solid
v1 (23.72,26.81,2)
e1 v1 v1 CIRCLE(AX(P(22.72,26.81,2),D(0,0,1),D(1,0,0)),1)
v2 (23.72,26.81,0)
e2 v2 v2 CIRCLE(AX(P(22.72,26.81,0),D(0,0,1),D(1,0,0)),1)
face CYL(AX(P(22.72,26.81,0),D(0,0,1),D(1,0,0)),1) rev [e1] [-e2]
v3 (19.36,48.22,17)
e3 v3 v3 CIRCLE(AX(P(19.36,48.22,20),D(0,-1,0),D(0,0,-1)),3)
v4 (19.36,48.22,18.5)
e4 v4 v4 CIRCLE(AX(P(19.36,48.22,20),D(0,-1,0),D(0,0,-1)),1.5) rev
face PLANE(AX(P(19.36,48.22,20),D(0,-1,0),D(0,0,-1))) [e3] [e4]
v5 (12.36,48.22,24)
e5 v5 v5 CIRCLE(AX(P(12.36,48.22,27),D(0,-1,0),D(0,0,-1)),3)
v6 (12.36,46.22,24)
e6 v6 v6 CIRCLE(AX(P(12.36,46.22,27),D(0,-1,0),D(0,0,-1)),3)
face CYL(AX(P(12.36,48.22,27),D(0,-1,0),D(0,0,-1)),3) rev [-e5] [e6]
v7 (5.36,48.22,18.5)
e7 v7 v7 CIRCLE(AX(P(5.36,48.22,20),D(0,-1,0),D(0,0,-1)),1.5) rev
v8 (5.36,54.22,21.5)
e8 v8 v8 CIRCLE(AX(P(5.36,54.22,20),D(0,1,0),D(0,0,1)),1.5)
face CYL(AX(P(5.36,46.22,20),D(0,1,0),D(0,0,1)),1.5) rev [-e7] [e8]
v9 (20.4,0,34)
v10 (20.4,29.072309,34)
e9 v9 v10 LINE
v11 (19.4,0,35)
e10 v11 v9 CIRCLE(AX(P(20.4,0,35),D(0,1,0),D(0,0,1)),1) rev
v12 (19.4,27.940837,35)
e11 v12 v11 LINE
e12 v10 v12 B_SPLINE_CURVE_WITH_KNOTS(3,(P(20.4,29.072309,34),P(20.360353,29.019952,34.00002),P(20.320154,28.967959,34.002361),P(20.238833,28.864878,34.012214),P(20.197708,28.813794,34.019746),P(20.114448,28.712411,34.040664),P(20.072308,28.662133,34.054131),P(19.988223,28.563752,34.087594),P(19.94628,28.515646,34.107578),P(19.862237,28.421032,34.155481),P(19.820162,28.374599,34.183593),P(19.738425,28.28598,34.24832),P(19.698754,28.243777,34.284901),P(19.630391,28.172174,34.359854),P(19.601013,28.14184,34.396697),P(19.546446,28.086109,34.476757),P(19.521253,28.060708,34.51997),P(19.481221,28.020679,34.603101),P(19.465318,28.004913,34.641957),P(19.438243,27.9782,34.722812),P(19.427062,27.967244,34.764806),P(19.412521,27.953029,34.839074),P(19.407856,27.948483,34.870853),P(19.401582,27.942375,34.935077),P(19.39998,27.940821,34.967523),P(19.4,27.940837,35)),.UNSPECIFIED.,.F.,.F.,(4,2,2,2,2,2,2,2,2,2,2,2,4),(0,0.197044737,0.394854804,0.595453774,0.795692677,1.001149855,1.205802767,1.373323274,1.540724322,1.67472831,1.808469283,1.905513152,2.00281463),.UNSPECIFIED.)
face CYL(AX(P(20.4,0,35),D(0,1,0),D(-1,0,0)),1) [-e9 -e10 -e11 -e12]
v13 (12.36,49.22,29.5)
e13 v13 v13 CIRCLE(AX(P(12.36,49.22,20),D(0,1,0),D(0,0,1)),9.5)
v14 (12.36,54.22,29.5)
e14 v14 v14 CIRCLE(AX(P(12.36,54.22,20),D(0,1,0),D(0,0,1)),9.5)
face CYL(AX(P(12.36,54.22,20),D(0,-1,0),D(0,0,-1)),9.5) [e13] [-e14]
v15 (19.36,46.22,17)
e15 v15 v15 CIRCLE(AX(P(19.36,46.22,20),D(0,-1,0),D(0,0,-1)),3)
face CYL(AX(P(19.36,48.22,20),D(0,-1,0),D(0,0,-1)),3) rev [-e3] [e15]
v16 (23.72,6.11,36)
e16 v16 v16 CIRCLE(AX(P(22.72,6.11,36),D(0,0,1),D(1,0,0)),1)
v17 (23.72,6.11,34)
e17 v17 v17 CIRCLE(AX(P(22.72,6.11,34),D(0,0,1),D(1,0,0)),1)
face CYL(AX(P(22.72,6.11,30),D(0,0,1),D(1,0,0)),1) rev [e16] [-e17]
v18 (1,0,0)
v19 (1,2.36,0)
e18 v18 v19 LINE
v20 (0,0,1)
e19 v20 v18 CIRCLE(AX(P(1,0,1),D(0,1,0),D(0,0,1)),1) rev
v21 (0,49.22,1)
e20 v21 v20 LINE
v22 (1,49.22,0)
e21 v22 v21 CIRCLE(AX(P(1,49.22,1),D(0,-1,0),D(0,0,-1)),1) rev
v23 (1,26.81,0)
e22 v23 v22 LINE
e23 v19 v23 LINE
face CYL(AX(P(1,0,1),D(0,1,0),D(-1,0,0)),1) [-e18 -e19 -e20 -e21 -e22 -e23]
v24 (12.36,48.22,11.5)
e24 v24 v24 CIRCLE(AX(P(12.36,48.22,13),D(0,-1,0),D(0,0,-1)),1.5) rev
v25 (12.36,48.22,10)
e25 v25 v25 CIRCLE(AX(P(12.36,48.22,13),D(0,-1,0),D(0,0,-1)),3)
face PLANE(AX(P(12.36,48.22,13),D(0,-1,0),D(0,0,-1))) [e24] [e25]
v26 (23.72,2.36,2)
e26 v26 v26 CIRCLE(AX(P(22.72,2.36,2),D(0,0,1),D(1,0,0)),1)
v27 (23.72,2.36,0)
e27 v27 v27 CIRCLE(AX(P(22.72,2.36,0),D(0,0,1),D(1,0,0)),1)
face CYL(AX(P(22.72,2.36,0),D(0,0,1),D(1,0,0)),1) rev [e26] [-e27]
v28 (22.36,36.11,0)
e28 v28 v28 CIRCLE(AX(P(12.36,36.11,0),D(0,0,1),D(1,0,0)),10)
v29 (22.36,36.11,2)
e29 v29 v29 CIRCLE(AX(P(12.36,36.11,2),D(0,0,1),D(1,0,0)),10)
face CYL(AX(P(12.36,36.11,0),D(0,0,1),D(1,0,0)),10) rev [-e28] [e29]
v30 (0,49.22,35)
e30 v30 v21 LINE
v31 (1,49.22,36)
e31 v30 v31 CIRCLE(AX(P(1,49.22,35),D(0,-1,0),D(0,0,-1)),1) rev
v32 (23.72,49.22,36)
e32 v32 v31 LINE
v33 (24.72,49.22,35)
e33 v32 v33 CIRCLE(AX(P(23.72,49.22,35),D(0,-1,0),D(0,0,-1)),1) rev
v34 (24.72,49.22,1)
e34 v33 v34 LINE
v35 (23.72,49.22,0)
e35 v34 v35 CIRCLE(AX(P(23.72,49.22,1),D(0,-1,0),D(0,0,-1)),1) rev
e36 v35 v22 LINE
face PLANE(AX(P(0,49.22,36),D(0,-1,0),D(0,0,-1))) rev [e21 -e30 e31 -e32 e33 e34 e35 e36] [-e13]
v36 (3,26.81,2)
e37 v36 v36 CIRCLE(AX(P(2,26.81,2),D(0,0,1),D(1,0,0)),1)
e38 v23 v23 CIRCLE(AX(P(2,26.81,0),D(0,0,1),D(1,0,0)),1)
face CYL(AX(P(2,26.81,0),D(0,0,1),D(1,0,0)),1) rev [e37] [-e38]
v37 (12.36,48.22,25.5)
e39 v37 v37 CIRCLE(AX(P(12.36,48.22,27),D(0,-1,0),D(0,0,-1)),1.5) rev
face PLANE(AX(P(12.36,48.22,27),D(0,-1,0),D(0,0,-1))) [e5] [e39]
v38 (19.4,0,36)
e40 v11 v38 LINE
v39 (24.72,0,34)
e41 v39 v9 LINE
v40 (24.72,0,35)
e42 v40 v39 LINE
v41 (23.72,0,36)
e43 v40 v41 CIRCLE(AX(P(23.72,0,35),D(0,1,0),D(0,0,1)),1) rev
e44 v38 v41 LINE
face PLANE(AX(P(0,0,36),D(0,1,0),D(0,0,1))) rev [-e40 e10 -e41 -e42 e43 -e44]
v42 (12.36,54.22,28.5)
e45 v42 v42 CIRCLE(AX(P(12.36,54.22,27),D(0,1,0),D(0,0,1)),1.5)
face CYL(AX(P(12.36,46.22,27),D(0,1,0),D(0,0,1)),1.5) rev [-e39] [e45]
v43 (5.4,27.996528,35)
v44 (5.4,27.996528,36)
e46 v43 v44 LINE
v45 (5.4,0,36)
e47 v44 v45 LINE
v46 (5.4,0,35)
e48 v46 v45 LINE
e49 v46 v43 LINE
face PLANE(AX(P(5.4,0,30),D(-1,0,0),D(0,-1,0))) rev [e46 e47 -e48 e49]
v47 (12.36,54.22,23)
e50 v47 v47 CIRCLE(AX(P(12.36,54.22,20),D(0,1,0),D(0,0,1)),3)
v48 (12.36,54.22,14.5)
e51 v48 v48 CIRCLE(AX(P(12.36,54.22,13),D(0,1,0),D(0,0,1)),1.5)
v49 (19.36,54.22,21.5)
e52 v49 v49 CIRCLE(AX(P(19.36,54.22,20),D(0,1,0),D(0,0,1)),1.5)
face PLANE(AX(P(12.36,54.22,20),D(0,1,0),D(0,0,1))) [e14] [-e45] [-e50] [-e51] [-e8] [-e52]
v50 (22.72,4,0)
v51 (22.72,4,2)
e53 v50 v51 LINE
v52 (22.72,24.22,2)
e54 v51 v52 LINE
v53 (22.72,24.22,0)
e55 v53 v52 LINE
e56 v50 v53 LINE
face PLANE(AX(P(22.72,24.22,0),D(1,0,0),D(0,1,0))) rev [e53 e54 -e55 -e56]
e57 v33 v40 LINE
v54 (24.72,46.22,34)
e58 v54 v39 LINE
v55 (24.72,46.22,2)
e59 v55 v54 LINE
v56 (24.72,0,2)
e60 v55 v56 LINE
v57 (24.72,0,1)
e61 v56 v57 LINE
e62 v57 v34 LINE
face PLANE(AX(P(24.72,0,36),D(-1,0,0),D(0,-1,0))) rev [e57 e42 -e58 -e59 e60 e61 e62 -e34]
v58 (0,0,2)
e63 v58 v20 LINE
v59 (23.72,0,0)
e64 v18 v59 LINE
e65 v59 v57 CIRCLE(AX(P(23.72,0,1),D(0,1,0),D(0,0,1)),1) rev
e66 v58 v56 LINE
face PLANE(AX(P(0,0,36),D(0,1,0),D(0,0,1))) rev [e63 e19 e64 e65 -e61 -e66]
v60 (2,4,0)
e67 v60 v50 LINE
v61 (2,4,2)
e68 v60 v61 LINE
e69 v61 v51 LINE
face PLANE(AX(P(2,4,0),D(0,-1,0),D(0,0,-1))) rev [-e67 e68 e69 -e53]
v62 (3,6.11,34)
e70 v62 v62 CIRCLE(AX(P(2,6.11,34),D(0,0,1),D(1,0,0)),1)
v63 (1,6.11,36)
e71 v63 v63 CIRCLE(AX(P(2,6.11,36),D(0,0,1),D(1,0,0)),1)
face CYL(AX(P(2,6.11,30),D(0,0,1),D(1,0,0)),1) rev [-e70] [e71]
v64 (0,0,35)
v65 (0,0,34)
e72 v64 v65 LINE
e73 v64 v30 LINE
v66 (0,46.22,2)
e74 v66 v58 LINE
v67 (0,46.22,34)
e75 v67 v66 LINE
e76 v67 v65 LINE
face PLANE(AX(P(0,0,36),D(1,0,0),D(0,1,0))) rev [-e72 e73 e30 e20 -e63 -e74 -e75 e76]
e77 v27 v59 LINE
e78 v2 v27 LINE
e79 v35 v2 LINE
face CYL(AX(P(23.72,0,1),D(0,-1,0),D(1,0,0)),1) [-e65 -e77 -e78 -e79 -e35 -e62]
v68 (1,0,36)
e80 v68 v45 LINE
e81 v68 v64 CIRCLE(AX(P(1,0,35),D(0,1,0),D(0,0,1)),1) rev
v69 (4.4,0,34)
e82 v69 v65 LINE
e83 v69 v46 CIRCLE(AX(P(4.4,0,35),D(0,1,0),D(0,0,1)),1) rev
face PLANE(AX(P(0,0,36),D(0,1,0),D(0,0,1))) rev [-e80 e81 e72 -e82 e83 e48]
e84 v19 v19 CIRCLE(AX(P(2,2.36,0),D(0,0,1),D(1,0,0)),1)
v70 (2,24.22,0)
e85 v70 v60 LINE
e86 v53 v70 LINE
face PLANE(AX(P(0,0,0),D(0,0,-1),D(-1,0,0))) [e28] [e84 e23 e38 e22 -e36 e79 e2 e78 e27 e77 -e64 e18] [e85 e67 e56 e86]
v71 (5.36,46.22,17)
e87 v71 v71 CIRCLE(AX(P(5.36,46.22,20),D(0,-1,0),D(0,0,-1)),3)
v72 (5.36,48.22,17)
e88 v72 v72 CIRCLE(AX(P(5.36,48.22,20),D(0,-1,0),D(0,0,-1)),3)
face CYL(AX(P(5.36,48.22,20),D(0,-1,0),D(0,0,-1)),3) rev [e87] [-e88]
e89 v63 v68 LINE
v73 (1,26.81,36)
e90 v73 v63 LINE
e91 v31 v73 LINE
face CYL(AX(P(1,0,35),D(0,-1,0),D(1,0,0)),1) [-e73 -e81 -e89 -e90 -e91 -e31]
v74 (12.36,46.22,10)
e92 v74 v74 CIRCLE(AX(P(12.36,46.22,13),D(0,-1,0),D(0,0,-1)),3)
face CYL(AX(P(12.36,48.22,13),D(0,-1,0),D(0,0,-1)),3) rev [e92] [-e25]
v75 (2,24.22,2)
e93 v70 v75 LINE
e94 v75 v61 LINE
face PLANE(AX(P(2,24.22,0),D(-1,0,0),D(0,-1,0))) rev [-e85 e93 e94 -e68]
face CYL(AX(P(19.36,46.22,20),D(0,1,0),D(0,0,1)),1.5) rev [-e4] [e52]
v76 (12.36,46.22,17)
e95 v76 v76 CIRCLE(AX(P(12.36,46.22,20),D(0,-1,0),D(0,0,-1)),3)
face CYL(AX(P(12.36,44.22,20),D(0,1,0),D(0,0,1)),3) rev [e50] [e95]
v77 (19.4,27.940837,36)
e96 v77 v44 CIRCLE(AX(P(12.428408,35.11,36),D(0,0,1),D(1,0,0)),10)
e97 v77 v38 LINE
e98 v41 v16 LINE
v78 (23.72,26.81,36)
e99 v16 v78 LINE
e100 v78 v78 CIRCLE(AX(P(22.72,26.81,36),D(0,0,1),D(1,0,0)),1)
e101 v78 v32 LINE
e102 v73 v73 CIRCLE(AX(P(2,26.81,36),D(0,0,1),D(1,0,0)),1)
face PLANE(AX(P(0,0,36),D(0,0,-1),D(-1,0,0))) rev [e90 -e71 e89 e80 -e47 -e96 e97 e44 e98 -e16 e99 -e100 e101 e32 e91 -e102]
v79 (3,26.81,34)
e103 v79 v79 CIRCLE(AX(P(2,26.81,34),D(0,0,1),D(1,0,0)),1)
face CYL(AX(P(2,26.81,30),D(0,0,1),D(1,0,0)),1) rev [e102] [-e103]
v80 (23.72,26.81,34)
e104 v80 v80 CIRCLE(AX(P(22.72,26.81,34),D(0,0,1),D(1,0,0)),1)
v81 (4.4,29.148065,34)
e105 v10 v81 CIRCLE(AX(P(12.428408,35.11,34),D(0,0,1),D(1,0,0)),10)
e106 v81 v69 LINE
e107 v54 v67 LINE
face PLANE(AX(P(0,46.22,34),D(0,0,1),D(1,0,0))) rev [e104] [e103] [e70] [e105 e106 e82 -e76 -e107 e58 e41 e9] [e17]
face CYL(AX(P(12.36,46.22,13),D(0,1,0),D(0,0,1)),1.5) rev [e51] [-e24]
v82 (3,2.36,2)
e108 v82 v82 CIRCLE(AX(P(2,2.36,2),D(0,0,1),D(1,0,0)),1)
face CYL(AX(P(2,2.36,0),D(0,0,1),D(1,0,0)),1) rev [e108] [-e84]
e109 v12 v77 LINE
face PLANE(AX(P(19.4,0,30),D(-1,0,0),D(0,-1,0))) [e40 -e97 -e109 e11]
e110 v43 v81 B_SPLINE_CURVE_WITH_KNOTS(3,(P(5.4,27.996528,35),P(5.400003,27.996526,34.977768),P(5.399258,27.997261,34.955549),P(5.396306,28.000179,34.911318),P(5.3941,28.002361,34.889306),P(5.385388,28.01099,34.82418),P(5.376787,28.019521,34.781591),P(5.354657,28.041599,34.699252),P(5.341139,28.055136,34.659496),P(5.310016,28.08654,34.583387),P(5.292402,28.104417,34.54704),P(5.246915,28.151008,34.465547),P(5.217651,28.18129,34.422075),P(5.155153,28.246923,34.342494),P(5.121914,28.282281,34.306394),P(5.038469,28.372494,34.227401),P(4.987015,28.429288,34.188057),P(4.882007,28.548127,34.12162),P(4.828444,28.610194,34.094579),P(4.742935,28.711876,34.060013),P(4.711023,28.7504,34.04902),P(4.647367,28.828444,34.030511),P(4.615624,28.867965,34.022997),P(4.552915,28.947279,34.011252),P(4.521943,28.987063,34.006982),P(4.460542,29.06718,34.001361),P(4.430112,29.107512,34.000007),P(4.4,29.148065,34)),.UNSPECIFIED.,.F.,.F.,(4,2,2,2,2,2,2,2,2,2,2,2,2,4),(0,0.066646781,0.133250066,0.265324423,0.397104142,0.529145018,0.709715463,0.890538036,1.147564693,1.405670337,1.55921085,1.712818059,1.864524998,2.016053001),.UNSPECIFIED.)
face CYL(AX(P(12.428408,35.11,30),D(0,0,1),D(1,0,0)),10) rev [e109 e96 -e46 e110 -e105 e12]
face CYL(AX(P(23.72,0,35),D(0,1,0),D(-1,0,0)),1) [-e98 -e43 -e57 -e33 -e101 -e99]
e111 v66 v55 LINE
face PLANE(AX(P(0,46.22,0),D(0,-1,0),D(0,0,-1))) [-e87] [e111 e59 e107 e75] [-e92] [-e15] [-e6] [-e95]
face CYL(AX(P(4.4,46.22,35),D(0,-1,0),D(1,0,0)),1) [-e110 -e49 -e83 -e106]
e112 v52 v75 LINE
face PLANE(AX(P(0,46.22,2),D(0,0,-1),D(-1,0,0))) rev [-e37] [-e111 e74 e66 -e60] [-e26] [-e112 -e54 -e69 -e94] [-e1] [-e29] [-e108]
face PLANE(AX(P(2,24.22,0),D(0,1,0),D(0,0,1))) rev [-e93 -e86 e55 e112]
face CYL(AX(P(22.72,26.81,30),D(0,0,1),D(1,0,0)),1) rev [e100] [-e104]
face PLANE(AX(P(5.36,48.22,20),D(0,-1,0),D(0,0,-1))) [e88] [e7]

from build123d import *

# Parameters (mm, degrees)
SKETCH_1_W          = 24.72
SKETCH_1_H          = 49.22
EXTRUDE_1_DEPTH     = 36
SKETCH_3_W          = 24.72
SKETCH_3_H          = 32
CUT_EXTRUDE_1_DEPTH = 46.22
SKETCH_4_R          = 1
SKETCH_4_R_2        = 10
SKETCH_4_W          = 20.72
SKETCH_4_H          = 20.22
CUT_EXTRUDE_2_DEPTH = 2
SKETCH_6_R          = 1
CUT_EXTRUDE_3_DEPTH = 6
SKETCH_7_R          = 9.5
EXTRUDE_2_DEPTH     = 5
SKETCH_8_R          = 1.5
CUT_EXTRUDE_4_DEPTH = 8
FILLET_5_R          = 1
FILLET_6_R          = 1
FILLET_7_R          = 1
FILLET_8_R          = 1
FILLET_9_R          = 1
FILLET_10_R         = 1
SKETCH_9_R          = 3
CUT_EXTRUDE_5_DEPTH = 10
SKETCH_10_R         = 3
CUT_EXTRUDE_6_DEPTH = 2


with BuildPart() as part:
    # 草图1 → 凸台-拉伸1 (new body)
    with BuildSketch(Plane.XY):
        with Locations((12.36, 24.61)):
            Rectangle(SKETCH_1_W, SKETCH_1_H)
    extrude(amount=EXTRUDE_1_DEPTH)

    # 草图3 → 切除-拉伸1 (cut)
    with BuildSketch(Plane.XZ):
        with Locations((12.36, 18)):
            Rectangle(SKETCH_3_W, SKETCH_3_H)
    extrude(amount=-CUT_EXTRUDE_1_DEPTH, mode=Mode.SUBTRACT)

    # 草图4 → 切除-拉伸2 (cut)
    with BuildSketch(Plane.XY.offset(2)):
        with Locations((2, 2.36)):
            Circle(SKETCH_4_R)
        with Locations((22.72, 2.36)):
            Circle(SKETCH_4_R)
        with Locations((22.72, 26.81)):
            Circle(SKETCH_4_R)
        with Locations((2, 26.81)):
            Circle(SKETCH_4_R)
        with Locations((12.36, 36.11)):
            Circle(SKETCH_4_R_2)
        with Locations((12.36, 14.11)):
            Rectangle(SKETCH_4_W, SKETCH_4_H)
    extrude(amount=-CUT_EXTRUDE_2_DEPTH, mode=Mode.SUBTRACT)

    # 草图6 → 切除-拉伸3 (cut)
    with BuildSketch(Plane.XY.offset(36)):
        with BuildLine():
            Line((5.4, 27.996527822), (5.4, 28))
            Line((5.4, 28), (19.4, 28))
            Line((19.4, 28), (19.4, 27.940836898))
            ThreePointArc((19.4, 27.940836898), (21.640245754, 31.218722824), (22.428407613, 35.11))
            ThreePointArc((22.428407613, 35.11), (8.573804918, 44.337244337), (5.4, 27.996527822))
        make_face()
        with BuildLine():
            Line((19.4, 28), (5.4, 28))
            Line((5.4, 28), (5.4, 27.996527822))
            ThreePointArc((5.4, 27.996527822), (12.388628696, 25.110079118), (19.4, 27.940836898))
            Line((19.4, 27.940836898), (19.4, 28))
        make_face()
        with BuildLine():
            ThreePointArc((19.4, 27.940836898), (12.388628696, 25.110079118), (5.4, 27.996527822))
            Line((5.4, 27.996527822), (5.4, 0))
            Line((5.4, 0), (19.4, 0))
            Line((19.4, 0), (19.4, 27.940836898))
        make_face()
        with Locations((2, 26.81)):
            Circle(SKETCH_6_R)
        with Locations((22.72, 6.11)):
            Circle(SKETCH_6_R)
        with Locations((2, 6.11)):
            Circle(SKETCH_6_R)
        with Locations((22.72, 26.81)):
            Circle(SKETCH_6_R)
    extrude(amount=-CUT_EXTRUDE_3_DEPTH, mode=Mode.SUBTRACT)

    # 草图7 → 凸台-拉伸2 (add)
    with BuildSketch(Plane(origin=(0, 49.22, 0), x_dir=(1, 0, 0), z_dir=(0, 1, 0))):
        with Locations(Location((12.36, -20, 0), (0, 0, 270))):
            Circle(SKETCH_7_R)
    extrude(amount=EXTRUDE_2_DEPTH)

    # 草图8 → 切除-拉伸4 (cut)
    with BuildSketch(Plane(origin=(0, 54.22, 0), x_dir=(1, 0, 0), z_dir=(0, 1, 0))):
        with Locations(Location((12.36, -13, 0), (0, 0, 270))):
            Circle(SKETCH_8_R)
        with Locations(Location((12.36, -27, 0), (0, 0, 270))):
            Circle(SKETCH_8_R)
        with Locations(Location((19.36, -20, 0), (0, 0, 270))):
            Circle(SKETCH_8_R)
        with Locations(Location((5.36, -20, 0), (0, 0, 270))):
            Circle(SKETCH_8_R)
    extrude(amount=-CUT_EXTRUDE_4_DEPTH, mode=Mode.SUBTRACT)

    # 圆角5
    fillet_5_edges = [part.edges().sort_by_distance(p)[0] for p in [
        (0, 24.61, 36),
    ]]
    fillet(fillet_5_edges, radius=FILLET_5_R - 0.0001)  # a hair under: the kernel refuses the full size

    # 圆角6
    fillet_6_edges = [part.edges().sort_by_distance(p)[0] for p in [
        (24.72, 24.61, 36),
    ]]
    fillet(fillet_6_edges, radius=FILLET_6_R - 0.0001)  # a hair under: the kernel refuses the full size

    # 圆角7
    fillet_7_edges = [part.edges().sort_by_distance(p)[0] for p in [
        (0, 24.61, 0),
    ]]
    fillet(fillet_7_edges, radius=FILLET_7_R - 0.0001)  # a hair under: the kernel refuses the full size

    # 圆角8
    fillet_8_edges = [part.edges().sort_by_distance(p)[0] for p in [
        (24.72, 24.61, 0),
    ]]
    fillet(fillet_8_edges, radius=FILLET_8_R - 0.0001)  # a hair under: the kernel refuses the full size

    # 圆角9
    fillet_9_edges = [part.edges().sort_by_distance(p)[0] for p in [
        (19.4, 13.970418449, 34),
    ]]
    fillet(fillet_9_edges, radius=FILLET_9_R)

    # 圆角10
    fillet_10_edges = [part.edges().sort_by_distance(p)[0] for p in [
        (5.4, 13.998263911, 34),
    ]]
    fillet(fillet_10_edges, radius=FILLET_10_R)

    # 草图9 → 切除-拉伸5 (cut)
    with BuildSketch(Plane(origin=(0, 54.22, 0), x_dir=(1, 0, 0), z_dir=(0, 1, 0))):
        with Locations(Location((12.36, -20, 0), (0, 0, 270))):
            Circle(SKETCH_9_R)
    extrude(amount=-CUT_EXTRUDE_5_DEPTH, mode=Mode.SUBTRACT)

    # 草图10 → 切除-拉伸6 (cut)
    with BuildSketch(Plane.XZ.offset(-46.22)):
        with Locations(Location((12.36, 27, 0), (0, 0, 270))):
            Circle(SKETCH_10_R)
        with Locations(Location((5.36, 20, 0), (0, 0, 270))):
            Circle(SKETCH_10_R)
        with Locations(Location((12.36, 13, 0), (0, 0, 270))):
            Circle(SKETCH_10_R)
        with Locations(Location((19.36, 20, 0), (0, 0, 270))):
            Circle(SKETCH_10_R)
    extrude(amount=-CUT_EXTRUDE_6_DEPTH, mode=Mode.SUBTRACT)


solid = part.part
